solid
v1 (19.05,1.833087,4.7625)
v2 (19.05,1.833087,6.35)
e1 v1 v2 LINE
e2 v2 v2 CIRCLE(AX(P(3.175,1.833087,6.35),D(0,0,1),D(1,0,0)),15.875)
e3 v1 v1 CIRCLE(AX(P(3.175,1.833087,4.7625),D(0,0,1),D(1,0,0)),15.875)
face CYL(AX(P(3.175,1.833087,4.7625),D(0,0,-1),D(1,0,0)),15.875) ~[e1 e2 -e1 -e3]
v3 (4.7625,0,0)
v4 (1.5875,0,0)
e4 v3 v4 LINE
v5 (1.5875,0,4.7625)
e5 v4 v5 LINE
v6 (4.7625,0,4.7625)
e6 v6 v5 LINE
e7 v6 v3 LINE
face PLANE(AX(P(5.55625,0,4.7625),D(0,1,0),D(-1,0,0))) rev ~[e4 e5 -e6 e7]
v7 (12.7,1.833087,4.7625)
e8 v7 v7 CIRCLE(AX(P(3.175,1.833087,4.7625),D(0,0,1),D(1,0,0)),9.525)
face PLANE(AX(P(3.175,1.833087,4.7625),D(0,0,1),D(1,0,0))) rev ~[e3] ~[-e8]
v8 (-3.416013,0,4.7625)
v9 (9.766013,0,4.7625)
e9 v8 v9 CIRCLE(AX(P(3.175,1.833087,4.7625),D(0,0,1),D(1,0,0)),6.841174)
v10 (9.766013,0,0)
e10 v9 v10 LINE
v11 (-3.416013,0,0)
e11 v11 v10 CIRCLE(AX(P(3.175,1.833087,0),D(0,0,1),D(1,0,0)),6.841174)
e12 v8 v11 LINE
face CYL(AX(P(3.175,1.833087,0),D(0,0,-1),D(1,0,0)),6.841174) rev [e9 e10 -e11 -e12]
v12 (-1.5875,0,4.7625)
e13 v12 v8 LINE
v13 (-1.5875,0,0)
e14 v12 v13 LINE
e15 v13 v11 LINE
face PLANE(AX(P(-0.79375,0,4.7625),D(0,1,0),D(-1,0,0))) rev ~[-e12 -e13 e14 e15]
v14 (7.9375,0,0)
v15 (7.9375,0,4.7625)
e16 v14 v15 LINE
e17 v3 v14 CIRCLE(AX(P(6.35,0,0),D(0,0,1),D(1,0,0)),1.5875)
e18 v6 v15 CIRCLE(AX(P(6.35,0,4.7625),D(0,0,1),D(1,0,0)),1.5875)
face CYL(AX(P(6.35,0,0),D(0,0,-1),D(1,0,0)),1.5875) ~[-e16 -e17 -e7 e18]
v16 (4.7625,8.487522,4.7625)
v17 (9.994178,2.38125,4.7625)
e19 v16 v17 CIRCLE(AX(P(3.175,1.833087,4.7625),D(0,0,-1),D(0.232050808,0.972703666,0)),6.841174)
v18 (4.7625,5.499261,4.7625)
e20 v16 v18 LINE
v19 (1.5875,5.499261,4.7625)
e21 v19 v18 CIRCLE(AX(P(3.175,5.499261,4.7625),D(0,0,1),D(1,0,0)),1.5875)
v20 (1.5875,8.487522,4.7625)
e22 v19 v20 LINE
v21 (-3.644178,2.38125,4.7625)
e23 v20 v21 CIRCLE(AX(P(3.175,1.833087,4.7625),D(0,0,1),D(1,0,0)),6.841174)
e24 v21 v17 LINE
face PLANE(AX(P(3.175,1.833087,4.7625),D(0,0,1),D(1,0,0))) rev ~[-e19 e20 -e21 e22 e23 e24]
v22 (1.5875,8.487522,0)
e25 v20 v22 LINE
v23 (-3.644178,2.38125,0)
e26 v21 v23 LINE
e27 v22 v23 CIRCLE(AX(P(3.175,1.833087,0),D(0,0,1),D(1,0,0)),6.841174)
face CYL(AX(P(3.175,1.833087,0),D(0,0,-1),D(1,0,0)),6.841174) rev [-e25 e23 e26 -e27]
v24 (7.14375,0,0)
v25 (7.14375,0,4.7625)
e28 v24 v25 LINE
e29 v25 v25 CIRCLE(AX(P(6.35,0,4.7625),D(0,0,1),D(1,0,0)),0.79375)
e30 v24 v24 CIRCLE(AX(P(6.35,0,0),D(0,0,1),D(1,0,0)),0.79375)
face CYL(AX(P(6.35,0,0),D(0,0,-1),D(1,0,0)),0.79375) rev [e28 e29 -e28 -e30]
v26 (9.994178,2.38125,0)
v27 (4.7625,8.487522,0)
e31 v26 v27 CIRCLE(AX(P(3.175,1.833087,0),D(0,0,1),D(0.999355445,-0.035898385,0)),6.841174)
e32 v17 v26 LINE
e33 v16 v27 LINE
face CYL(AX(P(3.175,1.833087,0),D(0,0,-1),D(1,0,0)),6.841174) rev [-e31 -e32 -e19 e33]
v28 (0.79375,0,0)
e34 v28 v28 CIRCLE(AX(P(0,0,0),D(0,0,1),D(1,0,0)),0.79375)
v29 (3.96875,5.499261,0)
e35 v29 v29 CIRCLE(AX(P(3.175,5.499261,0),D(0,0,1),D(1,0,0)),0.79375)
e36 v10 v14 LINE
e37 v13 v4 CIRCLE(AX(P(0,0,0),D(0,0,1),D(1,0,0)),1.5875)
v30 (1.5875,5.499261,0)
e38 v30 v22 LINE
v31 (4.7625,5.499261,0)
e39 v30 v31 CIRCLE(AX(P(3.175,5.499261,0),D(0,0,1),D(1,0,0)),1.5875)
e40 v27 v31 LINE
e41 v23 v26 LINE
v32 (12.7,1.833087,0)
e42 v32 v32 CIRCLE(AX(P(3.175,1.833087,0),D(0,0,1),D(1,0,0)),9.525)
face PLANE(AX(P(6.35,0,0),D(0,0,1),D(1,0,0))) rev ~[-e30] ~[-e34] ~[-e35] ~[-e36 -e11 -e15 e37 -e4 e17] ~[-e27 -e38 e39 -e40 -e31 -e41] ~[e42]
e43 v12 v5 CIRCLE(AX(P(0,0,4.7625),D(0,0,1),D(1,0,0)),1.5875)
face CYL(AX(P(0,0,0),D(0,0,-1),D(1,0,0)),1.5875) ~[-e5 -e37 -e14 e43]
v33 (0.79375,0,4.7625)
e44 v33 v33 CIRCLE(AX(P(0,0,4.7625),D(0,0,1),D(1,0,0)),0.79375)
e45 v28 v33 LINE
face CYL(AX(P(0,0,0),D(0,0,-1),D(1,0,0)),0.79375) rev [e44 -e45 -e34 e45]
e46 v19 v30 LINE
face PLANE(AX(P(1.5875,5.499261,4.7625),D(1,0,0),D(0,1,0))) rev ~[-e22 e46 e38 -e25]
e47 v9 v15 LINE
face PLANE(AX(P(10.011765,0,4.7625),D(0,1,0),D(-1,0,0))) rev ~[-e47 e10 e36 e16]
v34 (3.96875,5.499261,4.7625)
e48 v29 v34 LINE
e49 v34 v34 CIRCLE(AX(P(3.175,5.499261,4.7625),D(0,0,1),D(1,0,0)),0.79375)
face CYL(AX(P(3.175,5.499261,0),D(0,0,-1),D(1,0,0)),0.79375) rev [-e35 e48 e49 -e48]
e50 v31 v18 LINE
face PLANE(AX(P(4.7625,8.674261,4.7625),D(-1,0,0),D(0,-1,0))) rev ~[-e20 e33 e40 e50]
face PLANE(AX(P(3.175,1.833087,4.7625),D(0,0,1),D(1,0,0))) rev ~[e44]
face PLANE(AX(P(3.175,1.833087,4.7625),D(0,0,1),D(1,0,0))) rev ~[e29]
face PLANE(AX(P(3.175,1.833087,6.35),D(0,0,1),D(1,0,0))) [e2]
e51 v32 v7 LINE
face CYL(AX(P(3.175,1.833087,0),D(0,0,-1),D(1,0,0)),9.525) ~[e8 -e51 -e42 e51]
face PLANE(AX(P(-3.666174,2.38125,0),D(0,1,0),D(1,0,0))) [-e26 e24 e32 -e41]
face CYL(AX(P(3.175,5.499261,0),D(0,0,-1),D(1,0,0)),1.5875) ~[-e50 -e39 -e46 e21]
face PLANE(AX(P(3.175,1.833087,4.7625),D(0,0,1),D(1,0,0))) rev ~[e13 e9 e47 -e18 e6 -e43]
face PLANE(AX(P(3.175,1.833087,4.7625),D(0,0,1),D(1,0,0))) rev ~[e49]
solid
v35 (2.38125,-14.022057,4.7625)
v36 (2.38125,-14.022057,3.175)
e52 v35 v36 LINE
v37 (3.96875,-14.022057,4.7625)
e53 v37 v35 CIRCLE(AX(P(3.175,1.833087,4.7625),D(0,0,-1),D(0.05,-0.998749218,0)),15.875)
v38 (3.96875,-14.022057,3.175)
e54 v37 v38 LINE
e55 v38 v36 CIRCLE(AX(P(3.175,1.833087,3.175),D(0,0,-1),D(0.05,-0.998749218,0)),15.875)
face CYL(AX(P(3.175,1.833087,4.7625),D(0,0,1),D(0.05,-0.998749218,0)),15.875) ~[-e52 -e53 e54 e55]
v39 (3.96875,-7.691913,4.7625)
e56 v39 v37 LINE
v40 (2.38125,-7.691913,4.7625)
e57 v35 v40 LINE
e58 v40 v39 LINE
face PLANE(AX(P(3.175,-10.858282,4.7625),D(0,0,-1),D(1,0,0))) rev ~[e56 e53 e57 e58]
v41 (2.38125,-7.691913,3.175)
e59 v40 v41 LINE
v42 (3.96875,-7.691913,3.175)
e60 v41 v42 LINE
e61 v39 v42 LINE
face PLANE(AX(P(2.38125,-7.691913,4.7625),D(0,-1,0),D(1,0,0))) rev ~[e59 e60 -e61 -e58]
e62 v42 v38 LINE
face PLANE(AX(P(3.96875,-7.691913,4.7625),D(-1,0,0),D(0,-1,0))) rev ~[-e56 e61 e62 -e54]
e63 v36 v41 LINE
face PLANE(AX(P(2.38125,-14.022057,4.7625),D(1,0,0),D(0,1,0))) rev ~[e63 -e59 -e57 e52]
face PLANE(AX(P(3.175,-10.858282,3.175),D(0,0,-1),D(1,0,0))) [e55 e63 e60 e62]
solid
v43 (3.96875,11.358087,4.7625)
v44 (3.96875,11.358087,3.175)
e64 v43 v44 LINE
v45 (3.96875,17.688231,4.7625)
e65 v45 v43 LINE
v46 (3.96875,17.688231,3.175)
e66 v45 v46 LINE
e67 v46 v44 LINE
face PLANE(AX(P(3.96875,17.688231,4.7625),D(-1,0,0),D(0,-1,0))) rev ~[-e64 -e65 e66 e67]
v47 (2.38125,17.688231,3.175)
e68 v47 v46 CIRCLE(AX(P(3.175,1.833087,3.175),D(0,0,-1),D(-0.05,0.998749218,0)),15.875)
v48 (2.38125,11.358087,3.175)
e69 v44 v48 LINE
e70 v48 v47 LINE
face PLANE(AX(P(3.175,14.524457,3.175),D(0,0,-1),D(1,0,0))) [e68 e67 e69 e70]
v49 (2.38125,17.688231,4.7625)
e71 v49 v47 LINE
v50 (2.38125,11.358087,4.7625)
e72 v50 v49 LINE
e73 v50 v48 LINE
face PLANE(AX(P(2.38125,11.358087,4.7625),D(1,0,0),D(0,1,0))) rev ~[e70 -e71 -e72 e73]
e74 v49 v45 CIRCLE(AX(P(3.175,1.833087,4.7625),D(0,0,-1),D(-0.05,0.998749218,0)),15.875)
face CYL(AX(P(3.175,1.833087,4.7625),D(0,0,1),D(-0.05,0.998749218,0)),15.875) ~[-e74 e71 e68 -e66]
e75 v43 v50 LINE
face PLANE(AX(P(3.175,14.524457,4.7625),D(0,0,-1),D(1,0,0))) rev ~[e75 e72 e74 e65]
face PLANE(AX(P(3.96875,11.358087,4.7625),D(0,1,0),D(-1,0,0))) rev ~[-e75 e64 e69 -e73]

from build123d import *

# Parameters (mm, degrees)
F0_R     = 1.5875
F0_R_2   = 0.79375
F1_DEPTH = 4.7625
F0_R_3   = 9.525
F0_R_4   = 6.8411742094
F2_R     = 15.875
F3_DEPTH = 1.5875
F5_DEPTH = 1.5875
F7_DEPTH = 4.7625
F8_W     = 13.6823484187
F8_H     = 0.79375
F9_DEPTH = 4.7625


with BuildPart() as f1:
    # F0 (on Top) → F1 (new body)
    with BuildSketch(Plane.XY):
        with Locations((3.175, 5.499261314)):
            Circle(F0_R)
        with Locations((3.175, 5.499261314)):
            Circle(F0_R_2, mode=Mode.SUBTRACT)
    extrude(amount=F1_DEPTH)



with BuildPart() as f1b:
    # F0 (on Top) → F1, piece 2 (new body)
    with BuildSketch(Plane.XY):
        Circle(F0_R)
        Circle(F0_R_2, mode=Mode.SUBTRACT)
    extrude(amount=F1_DEPTH)


with BuildPart() as f1c:
    # F0 (on Top) → F1, piece 3 (new body)
    with BuildSketch(Plane.XY):
        with Locations((6.35, 0)):
            Circle(F0_R)
        with Locations((6.35, 0)):
            Circle(F0_R_2, mode=Mode.SUBTRACT)
    extrude(amount=F1_DEPTH)


with BuildPart() as f1d:
    # F0 (on Top) → F1, piece 4 (new body)
    with BuildSketch(Plane.XY):
        with Locations((3.175, 1.8330871047)):
            Circle(F0_R_3)
        with Locations((3.175, 1.8330871047)):
            Circle(F0_R_4, mode=Mode.SUBTRACT)
    extrude(amount=F1_DEPTH)


with BuildPart() as f1_1:
    add(f1.part)

    add(f1b.part)  # F3 merges F1b

    add(f1c.part)  # F3 merges F1c

    add(f1d.part)  # F3 merges F1d
    # F2 (on face) → F3 (join)
    with BuildSketch(Plane.XY.offset(4.7625)):
        with Locations((3.175, 1.8330871047)):
            Circle(F2_R)
    extrude(amount=F3_DEPTH)

    # F6 (on face) → F7 (join, through all)
    with BuildSketch(Plane(origin=(0, 0, 4.7625), x_dir=(1, 0, 0), z_dir=(0, 0, -1))):
        with BuildLine():
            Line((5.55625, 0), (0.79375, 0))
            ThreePointArc((0.79375, 0), (0, -0.79375), (-0.79375, 0))
            Line((-0.79375, 0), (-3.6617646981, 0))
            Line((-3.6617646981, 0), (-3.6617646981, -1.5875))
            Line((-3.6617646981, -1.5875), (10.0117646981, -1.5875))
            Line((10.0117646981, -1.5875), (10.0117646981, 0))
            Line((10.0117646981, 0), (7.14375, 0))
            ThreePointArc((7.14375, 0), (6.35, -0.79375), (5.55625, 0))
        make_face()
        with BuildLine():
            ThreePointArc((4.7625, -5.499261314), (3.175, -7.086761314), (1.5875, -5.499261314))
            Line((1.5875, -5.499261314), (1.5875, -8.674261314))
            Line((1.5875, -8.674261314), (4.7625, -8.674261314))
            Line((4.7625, -8.674261314), (4.7625, -5.499261314))
        make_face()
    extrude(amount=F7_DEPTH)

    # F8 (on face) → F9 (join, through all)
    with BuildSketch(Plane(origin=(0, 0, 0), x_dir=(1, 0, 0), z_dir=(0, 0, -1))):
        with Locations((3.175, -1.984375)):
            Rectangle(F8_W, F8_H)
    extrude(amount=-F9_DEPTH)


with BuildPart() as f5:
    # F4 (on face) → F5 (new body)
    with BuildSketch(Plane(origin=(0, 0, 4.7625), x_dir=(1, 0, 0), z_dir=(0, 0, -1))):
        with BuildLine():
            Line((2.38125, 14.0220567275), (2.38125, 7.6919128953))
            Line((2.38125, 7.6919128953), (3.96875, 7.6919128953))
            Line((3.96875, 7.6919128953), (3.96875, 14.0220567275))
            ThreePointArc((3.96875, 14.0220567275), (3.175, 14.0419128953), (2.38125, 14.0220567275))
        make_face()
    extrude(amount=F5_DEPTH)


with BuildPart() as f5b:
    # F4 (on face) → F5, piece 2 (new body)
    with BuildSketch(Plane(origin=(0, 0, 4.7625), x_dir=(1, 0, 0), z_dir=(0, 0, -1))):
        with BuildLine():
            Line((3.96875, -11.3580871047), (2.38125, -11.3580871047))
            Line((2.38125, -11.3580871047), (2.38125, -17.6882309368))
            ThreePointArc((2.38125, -17.6882309368), (3.175, -17.7080871047), (3.96875, -17.6882309368))
            Line((3.96875, -17.6882309368), (3.96875, -11.3580871047))
        make_face()
    extrude(amount=F5_DEPTH)


solid = Compound([f1_1.part, f5.part, f5b.part])
